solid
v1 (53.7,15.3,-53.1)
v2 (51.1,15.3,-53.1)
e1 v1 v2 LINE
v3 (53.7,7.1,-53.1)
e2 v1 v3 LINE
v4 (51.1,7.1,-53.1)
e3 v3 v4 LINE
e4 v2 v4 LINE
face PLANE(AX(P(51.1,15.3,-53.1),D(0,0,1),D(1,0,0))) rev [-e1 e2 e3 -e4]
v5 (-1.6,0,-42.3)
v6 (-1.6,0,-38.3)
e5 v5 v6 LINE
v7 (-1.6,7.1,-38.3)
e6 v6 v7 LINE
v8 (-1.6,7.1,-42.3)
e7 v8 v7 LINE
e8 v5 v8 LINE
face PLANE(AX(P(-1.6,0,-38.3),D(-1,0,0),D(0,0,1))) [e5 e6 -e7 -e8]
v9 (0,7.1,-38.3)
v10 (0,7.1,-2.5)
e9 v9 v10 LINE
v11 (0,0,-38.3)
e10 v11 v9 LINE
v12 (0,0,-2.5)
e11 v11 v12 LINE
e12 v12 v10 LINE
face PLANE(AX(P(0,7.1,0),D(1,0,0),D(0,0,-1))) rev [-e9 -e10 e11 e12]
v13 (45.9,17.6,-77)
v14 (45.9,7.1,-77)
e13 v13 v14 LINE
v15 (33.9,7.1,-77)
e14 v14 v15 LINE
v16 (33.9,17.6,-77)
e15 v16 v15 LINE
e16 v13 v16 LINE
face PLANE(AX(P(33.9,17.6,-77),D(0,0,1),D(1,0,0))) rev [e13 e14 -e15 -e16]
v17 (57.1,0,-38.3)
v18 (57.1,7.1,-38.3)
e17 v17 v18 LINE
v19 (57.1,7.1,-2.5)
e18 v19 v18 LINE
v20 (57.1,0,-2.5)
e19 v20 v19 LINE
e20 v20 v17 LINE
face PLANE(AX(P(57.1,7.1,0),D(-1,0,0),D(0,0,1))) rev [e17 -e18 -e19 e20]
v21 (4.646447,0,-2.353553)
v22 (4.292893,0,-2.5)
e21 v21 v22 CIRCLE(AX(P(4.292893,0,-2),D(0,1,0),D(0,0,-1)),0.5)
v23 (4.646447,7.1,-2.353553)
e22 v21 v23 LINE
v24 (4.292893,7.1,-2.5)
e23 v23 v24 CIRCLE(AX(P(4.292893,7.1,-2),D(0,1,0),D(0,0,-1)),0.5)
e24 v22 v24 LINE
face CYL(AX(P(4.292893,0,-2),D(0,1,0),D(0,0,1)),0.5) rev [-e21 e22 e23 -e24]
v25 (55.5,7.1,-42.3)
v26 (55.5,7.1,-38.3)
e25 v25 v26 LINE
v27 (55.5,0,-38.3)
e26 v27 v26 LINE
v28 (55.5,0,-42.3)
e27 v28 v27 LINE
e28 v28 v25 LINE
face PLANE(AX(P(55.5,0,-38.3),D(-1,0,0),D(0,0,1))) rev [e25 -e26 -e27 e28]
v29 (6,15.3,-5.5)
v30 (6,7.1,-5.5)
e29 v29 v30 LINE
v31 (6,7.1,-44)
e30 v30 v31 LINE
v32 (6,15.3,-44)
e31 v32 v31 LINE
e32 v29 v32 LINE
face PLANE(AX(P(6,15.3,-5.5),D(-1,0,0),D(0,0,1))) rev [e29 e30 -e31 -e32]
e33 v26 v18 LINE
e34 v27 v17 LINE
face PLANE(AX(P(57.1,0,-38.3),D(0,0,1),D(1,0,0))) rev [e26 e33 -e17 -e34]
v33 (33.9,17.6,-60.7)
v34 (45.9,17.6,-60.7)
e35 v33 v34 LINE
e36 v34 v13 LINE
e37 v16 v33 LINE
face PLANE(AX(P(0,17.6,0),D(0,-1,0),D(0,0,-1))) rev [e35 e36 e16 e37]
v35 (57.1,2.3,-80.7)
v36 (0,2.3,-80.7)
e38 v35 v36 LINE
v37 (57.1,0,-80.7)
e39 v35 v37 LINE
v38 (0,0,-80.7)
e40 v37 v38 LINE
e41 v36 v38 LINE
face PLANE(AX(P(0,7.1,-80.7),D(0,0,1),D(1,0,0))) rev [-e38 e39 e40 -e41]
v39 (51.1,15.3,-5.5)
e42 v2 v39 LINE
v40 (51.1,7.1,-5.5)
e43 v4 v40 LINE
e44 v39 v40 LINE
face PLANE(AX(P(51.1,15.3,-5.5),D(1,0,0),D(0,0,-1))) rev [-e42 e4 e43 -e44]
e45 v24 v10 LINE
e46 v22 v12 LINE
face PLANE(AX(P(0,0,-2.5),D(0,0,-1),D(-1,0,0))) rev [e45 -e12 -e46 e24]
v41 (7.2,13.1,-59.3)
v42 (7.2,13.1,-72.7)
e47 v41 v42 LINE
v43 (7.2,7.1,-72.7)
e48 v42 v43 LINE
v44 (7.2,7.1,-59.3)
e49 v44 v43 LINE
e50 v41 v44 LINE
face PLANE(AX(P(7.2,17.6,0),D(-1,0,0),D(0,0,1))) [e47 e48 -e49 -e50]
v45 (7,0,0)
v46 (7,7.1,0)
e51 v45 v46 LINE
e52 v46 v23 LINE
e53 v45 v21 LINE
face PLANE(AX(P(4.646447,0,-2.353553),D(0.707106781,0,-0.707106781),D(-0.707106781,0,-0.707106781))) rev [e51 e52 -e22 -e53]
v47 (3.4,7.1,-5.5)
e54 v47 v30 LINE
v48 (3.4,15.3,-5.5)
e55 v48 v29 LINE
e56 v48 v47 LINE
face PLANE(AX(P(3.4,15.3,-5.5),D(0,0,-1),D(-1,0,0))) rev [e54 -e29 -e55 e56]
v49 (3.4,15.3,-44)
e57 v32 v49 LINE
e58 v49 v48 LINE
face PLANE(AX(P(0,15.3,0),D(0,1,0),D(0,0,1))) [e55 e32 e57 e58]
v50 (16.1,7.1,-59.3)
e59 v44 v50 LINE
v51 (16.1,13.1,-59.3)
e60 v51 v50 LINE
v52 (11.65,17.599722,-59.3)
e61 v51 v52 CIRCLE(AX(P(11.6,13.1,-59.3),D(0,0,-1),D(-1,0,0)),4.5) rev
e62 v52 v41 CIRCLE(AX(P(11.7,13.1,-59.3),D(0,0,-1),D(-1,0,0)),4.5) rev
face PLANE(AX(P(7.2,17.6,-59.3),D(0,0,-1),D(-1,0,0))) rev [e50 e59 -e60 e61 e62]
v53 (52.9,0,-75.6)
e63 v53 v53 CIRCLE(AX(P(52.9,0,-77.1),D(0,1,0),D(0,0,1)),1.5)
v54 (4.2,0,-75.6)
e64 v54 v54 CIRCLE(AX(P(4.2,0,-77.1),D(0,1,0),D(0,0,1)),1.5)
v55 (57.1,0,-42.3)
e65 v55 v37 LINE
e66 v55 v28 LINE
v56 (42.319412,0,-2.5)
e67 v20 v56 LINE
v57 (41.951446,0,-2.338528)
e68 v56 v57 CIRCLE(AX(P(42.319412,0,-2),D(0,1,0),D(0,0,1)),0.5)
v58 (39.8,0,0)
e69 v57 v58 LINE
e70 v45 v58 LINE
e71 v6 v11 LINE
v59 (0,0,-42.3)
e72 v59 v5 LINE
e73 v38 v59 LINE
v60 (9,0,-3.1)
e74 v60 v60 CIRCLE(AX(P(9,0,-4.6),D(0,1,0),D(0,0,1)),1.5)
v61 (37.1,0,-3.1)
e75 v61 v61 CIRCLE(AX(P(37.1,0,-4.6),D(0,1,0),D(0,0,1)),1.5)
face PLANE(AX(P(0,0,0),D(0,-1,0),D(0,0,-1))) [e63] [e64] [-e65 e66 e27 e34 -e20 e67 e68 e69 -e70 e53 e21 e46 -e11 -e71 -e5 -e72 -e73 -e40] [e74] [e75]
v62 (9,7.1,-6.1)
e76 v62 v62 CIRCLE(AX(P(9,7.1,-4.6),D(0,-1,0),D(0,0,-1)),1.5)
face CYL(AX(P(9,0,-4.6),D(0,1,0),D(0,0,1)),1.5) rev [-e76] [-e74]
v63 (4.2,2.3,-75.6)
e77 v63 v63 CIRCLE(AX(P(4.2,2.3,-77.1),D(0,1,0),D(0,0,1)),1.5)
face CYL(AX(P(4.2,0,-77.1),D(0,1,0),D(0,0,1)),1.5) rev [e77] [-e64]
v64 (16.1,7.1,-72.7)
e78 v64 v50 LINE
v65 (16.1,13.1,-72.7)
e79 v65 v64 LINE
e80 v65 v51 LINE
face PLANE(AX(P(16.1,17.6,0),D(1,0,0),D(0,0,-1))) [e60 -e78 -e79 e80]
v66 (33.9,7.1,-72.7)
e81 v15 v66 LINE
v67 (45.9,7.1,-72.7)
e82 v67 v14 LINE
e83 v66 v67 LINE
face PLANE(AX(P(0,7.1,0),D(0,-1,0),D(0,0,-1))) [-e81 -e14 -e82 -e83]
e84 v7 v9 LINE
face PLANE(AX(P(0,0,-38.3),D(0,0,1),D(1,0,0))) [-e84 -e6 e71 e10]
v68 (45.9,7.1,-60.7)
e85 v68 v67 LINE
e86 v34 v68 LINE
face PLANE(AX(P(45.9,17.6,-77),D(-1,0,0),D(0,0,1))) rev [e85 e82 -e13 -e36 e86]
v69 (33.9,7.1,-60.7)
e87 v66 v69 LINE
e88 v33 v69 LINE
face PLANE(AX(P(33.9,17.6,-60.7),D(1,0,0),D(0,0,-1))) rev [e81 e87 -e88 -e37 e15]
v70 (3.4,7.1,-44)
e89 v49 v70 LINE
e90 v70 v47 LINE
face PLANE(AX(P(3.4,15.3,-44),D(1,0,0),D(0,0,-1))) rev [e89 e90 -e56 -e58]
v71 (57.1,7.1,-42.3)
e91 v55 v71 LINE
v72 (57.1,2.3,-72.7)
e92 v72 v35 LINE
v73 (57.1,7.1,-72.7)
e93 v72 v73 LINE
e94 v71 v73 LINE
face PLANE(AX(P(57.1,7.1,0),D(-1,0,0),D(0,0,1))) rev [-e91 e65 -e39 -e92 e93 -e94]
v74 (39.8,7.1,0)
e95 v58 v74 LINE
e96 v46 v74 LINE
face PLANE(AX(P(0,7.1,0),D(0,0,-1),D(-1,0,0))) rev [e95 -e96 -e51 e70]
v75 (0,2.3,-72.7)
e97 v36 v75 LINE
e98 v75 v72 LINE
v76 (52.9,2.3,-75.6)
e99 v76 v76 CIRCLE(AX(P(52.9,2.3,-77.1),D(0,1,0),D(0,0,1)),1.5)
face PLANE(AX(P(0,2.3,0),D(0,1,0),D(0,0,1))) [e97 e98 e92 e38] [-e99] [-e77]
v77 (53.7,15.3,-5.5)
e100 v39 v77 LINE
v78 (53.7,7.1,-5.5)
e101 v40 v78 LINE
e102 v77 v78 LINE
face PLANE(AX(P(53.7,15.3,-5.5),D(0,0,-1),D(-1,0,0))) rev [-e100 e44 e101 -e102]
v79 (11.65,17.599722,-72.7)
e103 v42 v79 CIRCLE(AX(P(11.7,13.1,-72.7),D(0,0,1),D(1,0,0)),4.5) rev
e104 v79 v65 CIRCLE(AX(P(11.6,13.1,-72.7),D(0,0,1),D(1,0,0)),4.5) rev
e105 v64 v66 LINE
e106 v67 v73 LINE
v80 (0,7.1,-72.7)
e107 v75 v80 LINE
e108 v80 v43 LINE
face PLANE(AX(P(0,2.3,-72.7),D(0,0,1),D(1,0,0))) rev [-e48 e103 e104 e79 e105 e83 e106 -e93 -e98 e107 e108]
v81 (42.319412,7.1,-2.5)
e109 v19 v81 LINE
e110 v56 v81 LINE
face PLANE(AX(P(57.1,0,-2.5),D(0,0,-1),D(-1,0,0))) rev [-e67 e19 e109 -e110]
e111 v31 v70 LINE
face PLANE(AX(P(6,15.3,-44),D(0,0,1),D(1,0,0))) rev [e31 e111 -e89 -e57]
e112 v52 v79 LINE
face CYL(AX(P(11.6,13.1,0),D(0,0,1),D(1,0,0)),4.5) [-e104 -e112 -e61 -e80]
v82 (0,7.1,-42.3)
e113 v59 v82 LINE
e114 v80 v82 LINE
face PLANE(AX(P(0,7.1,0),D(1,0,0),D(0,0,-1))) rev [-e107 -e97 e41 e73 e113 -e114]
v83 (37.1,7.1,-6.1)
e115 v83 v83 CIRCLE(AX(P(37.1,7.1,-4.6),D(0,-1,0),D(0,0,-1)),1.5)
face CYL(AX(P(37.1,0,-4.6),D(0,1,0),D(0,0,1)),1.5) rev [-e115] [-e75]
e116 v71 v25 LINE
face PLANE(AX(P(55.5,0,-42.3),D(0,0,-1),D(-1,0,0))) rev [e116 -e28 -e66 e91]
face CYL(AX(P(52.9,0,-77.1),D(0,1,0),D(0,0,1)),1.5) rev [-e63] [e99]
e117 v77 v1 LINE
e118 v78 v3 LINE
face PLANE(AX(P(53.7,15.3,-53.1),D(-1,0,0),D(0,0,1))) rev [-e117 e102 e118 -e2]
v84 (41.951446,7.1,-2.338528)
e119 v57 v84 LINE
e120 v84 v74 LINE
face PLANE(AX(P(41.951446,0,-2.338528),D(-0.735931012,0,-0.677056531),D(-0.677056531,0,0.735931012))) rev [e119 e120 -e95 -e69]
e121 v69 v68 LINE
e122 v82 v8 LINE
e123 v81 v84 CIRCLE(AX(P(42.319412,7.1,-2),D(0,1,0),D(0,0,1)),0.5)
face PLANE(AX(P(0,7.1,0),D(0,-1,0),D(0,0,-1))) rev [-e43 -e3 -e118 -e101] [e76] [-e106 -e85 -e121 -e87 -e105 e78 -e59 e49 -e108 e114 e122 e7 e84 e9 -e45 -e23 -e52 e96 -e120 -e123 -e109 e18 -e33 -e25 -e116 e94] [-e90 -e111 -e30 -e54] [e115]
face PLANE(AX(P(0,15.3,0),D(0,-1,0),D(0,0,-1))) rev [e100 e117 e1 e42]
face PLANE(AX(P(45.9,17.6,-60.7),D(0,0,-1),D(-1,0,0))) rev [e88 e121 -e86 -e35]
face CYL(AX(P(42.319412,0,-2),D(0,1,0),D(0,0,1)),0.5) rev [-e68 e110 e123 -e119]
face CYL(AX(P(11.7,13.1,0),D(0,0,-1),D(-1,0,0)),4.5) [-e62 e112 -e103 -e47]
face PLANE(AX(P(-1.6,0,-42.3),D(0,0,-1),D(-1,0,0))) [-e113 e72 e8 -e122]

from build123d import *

# Parameters (mm, degrees)
SKETCH_1_W               = 57.1
SKETCH_1_H               = 80.7
EXTRUDE_1_DEPTH          = 7.1
SKETCH_3_W               = 57.1
SKETCH_3_H               = 8
CUT_EXTRUDE_2_DEPTH      = 4.8
CUT_EXTRUDE_3_DEPTH      = 100.112612719
SKETCH_5_W               = 1.6
SKETCH_5_H               = 4
CUT_EXTRUDE_4_DEPTH      = 100.112612719
SKETCH_6_W               = 1.6
SKETCH_6_H               = 4
EXTRUDE_2_DEPTH          = 7.1
SKETCH_7_W               = 2.6
SKETCH_7_H               = 47.6
SKETCH_7_H_2             = 38.5
EXTRUDE_3_DEPTH          = 8.2
SKETCH_8_W               = 12
SKETCH_8_H               = 16.3
EXTRUDE_4_DEPTH          = 10.5
SKETCH_9_W               = 4.45
SKETCH_9_H               = 3
EXTRUDE_5_DEPTH          = 10.5
SKETCH_10_W              = 8.9
SKETCH_10_H              = 10.4
EXTRUDE_6_DEPTH          = 10.5
FILLET_1_R               = 4.5
CUT_EXTRUDE_7_DEPTH      = 101.034943895
CUT_EXTRUDE_7_DEPTH_BACK = 101.034943895
SKETCH_11_R              = 1.5


with BuildPart() as part:
    # 草图1 → 凸台-拉伸1 (new body)
    with BuildSketch(Plane(origin=(0, 0, 0), x_dir=(1, 0, 0), z_dir=(0, 1, 0))):
        with Locations((28.55, 40.35)):
            Rectangle(SKETCH_1_W, SKETCH_1_H)
    extrude(amount=EXTRUDE_1_DEPTH)

    # 草图3 → 切除-拉伸2 (cut)
    with BuildSketch(Plane(origin=(0, 7.1, 0), x_dir=(1, 0, 0), z_dir=(0, 1, 0))):
        with Locations((28.55, 76.7)):
            Rectangle(SKETCH_3_W, SKETCH_3_H)
    extrude(amount=-CUT_EXTRUDE_2_DEPTH, mode=Mode.SUBTRACT)

    # 草图4 → 切除-拉伸3 (cut, through all)
    with BuildSketch(Plane(origin=(0, 7.1, 0), x_dir=(1, 0, 0), z_dir=(0, 1, 0))):
        with BuildLine():
            Line((57.1, 0), (57.1, 2.5))
            Line((57.1, 2.5), (42.31941151, 2.5))
            ThreePointArc((42.31941151, 2.5), (42.118493782, 2.457855945), (41.951446004, 2.338528265))
            Line((41.951446004, 2.338528265), (39.8, 0))
            Line((39.8, 0), (57.1, 0))
        make_face()
        with BuildLine():
            Line((0, 2.5), (4.292893219, 2.5))
            ThreePointArc((4.292893219, 2.5), (4.484234935, 2.461939766), (4.646446609, 2.353553391))
            Line((4.646446609, 2.353553391), (7, 0))
            Line((7, 0), (0, 0))
            Line((0, 0), (0, 2.5))
        make_face()
    extrude(amount=-CUT_EXTRUDE_3_DEPTH, mode=Mode.SUBTRACT)

    # 草图5 → 切除-拉伸4 (cut, through all)
    with BuildSketch(Plane(origin=(0, 7.1, 0), x_dir=(1, 0, 0), z_dir=(0, 1, 0))):
        with Locations((56.3, 40.3)):
            Rectangle(SKETCH_5_W, SKETCH_5_H)
    extrude(amount=-CUT_EXTRUDE_4_DEPTH, mode=Mode.SUBTRACT)

    # 草图6 → 凸台-拉伸2 (add)
    with BuildSketch(Plane(origin=(0, 7.1, 0), x_dir=(1, 0, 0), z_dir=(0, 1, 0))):
        with Locations((-0.8, 40.3)):
            Rectangle(SKETCH_6_W, SKETCH_6_H)
    extrude(amount=-EXTRUDE_2_DEPTH)

    # 草图7 → 凸台-拉伸3 (add)
    with BuildSketch(Plane(origin=(0, 7.1, 0), x_dir=(1, 0, 0), z_dir=(0, 1, 0))):
        with Locations((52.4, 29.3)):
            Rectangle(SKETCH_7_W, SKETCH_7_H)
        with Locations((4.7, 24.75)):
            Rectangle(SKETCH_7_W, SKETCH_7_H_2)
    extrude(amount=EXTRUDE_3_DEPTH)

    # 草图8 → 凸台-拉伸4 (add)
    with BuildSketch(Plane(origin=(0, 7.1, 0), x_dir=(1, 0, 0), z_dir=(0, 1, 0))):
        with Locations((39.9, 68.85)):
            Rectangle(SKETCH_8_W, SKETCH_8_H)
    extrude(amount=EXTRUDE_4_DEPTH)

    # 草图9 → 凸台-拉伸5 (add)
    with BuildSketch(Plane(origin=(0, 7.1, 0), x_dir=(1, 0, 0), z_dir=(0, 1, 0))):
        with Locations((13.875, 71.2)):
            Rectangle(SKETCH_9_W, SKETCH_9_H)
        with Locations((9.425, 71.2)):
            Rectangle(SKETCH_9_W, SKETCH_9_H)
    extrude(amount=EXTRUDE_5_DEPTH)

    # 草图10 → 凸台-拉伸6 (add)
    with BuildSketch(Plane(origin=(0, 7.1, 0), x_dir=(1, 0, 0), z_dir=(0, 1, 0))):
        with Locations((11.65, 64.5)):
            Rectangle(SKETCH_10_W, SKETCH_10_H)
    extrude(amount=EXTRUDE_6_DEPTH)

    # 圆角1
    # the kernel refuses this fillet: 4.5 mm, written as the material it takes off along each edge
    with BuildSketch(Plane(origin=(7.2, 17.6, -48.05), x_dir=(0, -1, 0), z_dir=(0, 0, -1))) as fillet_1_piece_1:
        with BuildLine():
            CenterArc((FILLET_1_R, -FILLET_1_R), FILLET_1_R, 90, 90)
            Line((0, -FILLET_1_R), (0, 0))
            Line((0, 0), (FILLET_1_R, 0))
        make_face()
    extrude(amount=35.9, mode=Mode.SUBTRACT)
    with BuildSketch(Plane(origin=(16.1, 17.6, -83.95), x_dir=(-1, 0, 0), z_dir=(0, 0, 1))) as fillet_1_piece_2:
        with BuildLine():
            CenterArc((FILLET_1_R, FILLET_1_R), FILLET_1_R, 180, 90)
            Line((0, FILLET_1_R), (0, 0))
            Line((0, 0), (FILLET_1_R, 0))
        make_face()
    extrude(amount=35.9, mode=Mode.SUBTRACT)

    # 草图11 → 切除-拉伸7 (cut, two sides: drawn at the far end of the back side and taken through both)
    with BuildSketch(Plane(origin=(0, 2.3, 0), x_dir=(1, 0, 0), z_dir=(0, 1, 0)).offset(-CUT_EXTRUDE_7_DEPTH_BACK)):
        with Locations(Location((52.9, 77.1, 0), (0, 0, 270))):
            Circle(SKETCH_11_R)
        with Locations(Location((4.2, 77.1, 0), (0, 0, 270))):
            Circle(SKETCH_11_R)
        with Locations(Location((37.1, 4.6, 0), (0, 0, 270))):
            Circle(SKETCH_11_R)
        with Locations(Location((9, 4.6, 0), (0, 0, 270))):
            Circle(SKETCH_11_R)
    extrude(amount=CUT_EXTRUDE_7_DEPTH + CUT_EXTRUDE_7_DEPTH_BACK, mode=Mode.SUBTRACT)


solid = part.part
